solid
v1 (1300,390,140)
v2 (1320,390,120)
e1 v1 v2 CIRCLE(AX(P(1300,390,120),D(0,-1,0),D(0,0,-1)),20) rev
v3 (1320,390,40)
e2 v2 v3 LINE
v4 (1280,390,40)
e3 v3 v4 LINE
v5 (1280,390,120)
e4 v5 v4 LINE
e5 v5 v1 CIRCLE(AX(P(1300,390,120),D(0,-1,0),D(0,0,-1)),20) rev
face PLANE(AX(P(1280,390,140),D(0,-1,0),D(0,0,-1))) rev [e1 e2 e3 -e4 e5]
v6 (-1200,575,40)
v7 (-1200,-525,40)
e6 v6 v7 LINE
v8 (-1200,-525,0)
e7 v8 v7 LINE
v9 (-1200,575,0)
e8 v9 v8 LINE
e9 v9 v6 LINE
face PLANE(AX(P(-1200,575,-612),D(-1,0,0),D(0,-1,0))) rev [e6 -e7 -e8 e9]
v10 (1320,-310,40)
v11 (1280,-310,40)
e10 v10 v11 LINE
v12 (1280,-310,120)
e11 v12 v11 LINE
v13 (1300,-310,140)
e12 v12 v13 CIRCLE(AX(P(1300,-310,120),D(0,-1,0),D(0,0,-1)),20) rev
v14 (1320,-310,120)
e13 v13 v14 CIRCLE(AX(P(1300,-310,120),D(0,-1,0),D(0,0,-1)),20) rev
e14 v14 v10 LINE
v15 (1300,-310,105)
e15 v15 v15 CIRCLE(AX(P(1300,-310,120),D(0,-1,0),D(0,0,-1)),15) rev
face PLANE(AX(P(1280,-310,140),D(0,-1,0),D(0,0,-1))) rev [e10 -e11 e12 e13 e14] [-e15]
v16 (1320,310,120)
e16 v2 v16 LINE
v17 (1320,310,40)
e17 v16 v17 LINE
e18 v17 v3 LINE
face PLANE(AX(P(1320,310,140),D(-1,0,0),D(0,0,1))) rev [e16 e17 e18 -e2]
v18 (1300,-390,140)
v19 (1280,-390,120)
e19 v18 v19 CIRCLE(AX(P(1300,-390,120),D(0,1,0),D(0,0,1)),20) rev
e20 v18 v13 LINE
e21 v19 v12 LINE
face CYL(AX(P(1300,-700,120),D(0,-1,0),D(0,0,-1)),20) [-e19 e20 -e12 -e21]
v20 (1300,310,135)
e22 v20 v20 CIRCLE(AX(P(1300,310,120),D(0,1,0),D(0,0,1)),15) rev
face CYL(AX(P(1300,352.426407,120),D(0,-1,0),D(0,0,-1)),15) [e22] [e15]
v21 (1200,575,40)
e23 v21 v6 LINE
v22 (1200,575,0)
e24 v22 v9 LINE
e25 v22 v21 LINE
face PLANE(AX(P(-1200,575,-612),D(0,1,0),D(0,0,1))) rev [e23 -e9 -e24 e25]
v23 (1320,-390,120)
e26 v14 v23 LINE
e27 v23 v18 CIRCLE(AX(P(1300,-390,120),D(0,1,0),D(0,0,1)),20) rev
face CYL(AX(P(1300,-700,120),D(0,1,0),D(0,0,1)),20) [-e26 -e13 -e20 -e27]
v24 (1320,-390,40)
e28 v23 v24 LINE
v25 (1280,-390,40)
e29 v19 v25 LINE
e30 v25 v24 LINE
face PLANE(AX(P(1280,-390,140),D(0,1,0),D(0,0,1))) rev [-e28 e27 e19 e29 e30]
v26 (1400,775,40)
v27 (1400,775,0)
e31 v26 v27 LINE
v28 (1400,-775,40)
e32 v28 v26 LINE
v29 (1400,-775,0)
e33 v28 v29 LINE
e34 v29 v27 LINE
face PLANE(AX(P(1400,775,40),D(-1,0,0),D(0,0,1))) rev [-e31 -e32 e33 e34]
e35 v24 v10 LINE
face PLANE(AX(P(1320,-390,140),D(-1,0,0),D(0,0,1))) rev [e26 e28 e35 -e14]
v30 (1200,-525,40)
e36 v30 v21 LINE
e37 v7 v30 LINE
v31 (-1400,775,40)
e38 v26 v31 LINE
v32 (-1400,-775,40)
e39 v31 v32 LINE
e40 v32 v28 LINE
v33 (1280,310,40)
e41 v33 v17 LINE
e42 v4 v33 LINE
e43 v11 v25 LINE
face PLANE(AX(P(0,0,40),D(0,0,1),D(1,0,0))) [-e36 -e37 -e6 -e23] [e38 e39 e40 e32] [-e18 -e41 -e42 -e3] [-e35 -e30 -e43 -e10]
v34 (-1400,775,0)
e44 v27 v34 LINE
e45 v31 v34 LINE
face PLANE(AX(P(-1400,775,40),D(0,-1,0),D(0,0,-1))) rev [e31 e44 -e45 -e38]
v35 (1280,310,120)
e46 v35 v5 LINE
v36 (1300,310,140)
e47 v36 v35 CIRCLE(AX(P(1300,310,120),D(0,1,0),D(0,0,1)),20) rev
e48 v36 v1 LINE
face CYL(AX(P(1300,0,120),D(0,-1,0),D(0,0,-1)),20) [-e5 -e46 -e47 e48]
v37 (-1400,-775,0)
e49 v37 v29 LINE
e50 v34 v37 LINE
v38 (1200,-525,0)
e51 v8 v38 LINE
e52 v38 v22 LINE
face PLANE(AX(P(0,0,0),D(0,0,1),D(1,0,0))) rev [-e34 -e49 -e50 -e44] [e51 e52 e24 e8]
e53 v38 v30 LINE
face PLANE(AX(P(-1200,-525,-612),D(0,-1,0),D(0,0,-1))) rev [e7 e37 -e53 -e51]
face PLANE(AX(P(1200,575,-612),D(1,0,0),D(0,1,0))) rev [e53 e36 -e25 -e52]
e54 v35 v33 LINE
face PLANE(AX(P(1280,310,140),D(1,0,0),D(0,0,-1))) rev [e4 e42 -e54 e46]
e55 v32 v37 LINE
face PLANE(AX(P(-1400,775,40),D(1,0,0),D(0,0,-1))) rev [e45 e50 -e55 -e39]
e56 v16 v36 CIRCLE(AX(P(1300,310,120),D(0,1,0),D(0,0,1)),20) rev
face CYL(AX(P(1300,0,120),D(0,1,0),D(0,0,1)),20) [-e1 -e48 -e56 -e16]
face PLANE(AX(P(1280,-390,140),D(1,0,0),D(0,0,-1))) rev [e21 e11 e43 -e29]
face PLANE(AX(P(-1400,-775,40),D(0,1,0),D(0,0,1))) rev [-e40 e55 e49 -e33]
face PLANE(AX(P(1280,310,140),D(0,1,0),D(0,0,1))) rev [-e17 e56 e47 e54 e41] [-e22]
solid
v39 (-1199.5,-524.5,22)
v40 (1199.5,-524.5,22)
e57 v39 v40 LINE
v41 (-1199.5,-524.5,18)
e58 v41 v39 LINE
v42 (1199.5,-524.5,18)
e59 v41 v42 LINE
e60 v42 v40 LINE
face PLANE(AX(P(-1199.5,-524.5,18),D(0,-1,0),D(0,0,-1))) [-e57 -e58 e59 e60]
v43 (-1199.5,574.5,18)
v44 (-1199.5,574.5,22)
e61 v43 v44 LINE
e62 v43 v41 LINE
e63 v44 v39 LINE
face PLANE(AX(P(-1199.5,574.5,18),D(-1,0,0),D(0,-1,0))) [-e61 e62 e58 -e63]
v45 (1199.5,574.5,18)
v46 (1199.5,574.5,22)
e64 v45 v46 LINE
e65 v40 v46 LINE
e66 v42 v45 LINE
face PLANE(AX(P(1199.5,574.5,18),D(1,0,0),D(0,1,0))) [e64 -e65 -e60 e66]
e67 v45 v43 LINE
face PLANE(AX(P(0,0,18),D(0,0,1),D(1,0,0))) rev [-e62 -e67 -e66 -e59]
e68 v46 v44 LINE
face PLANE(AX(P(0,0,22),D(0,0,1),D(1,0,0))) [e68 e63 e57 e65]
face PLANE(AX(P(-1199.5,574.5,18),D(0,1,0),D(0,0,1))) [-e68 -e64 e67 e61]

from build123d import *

# Parameters (mm, degrees)
SKETCH1_W                = 2800
SKETCH1_H                = 1550
BOSS_EXTRUDE1_DEPTH      = 40
SKETCH3_W                = 40
SKETCH3_H                = 80
BOSS_EXTRUDE4_DEPTH      = 100
FILLET1_R                = 20
LPATTERN1_COUNT          = 2
LPATTERN1_PITCH          = 700
FILLET1_OF_LPATTERN1_R   = 20
SKETCH4_R                = 15
BOSS_EXTRUDE5_DEPTH      = 620
SKETCH5_W                = 2400
SKETCH5_H                = 1100
CUT_EXTRUDE1_DEPTH       = 652
BOSS_EXTRUDE6_DEPTH      = 2
BOSS_EXTRUDE6_DEPTH_BACK = 2
SKETCH6_W                = 2399
SKETCH6_H                = 1099


with BuildPart() as part:
    # Sketch1 → Boss-Extrude1 (new body)
    with BuildSketch(Plane.XY):
        Rectangle(SKETCH1_W, SKETCH1_H)
    extrude(amount=BOSS_EXTRUDE1_DEPTH)

    # Sketch3 → Boss-Extrude4 (add)
    with BuildSketch(Plane.XY.offset(40)):
        with Locations((1300, 350)):
            Rectangle(SKETCH3_W, SKETCH3_H)
    boss_extrude4 = extrude(amount=BOSS_EXTRUDE4_DEPTH)

    # Fillet1
    fillet1_edges = [part.edges().sort_by_distance(p)[0] for p in [
        (1280, 350, 140),
        (1320, 350, 140),
    ]]
    fillet(fillet1_edges, radius=FILLET1_R - 0.0001)  # a hair under: the kernel refuses the full size

    # LPattern1: Boss-Extrude4 ×2
    with Locations(*[(0, -i * LPATTERN1_PITCH, 0) for i in range(1, LPATTERN1_COUNT)]):
        add(boss_extrude4)

    # Fillet1 of LPattern1
    fillet1_of_lpattern1_edges = [part.edges().sort_by_distance(p)[0] for p in [
        (1280, -350, 140),
        (1320, -350, 140),
    ]]
    fillet(fillet1_of_lpattern1_edges, radius=FILLET1_OF_LPATTERN1_R - 0.0001)  # a hair under: the kernel refuses the full size

    # Sketch4 → Boss-Extrude5 (add)
    with BuildSketch(Plane(origin=(0, -310, 0), x_dir=(1, 0, 0), z_dir=(0, 1, 0))):
        with Locations(Location((1300, -120, 0), (0, 0, 90))):
            Circle(SKETCH4_R)
    extrude(amount=BOSS_EXTRUDE5_DEPTH)

    # Sketch5 → Cut-Extrude1 (cut)
    with BuildSketch(Plane.XY.offset(40)):
        with Locations((0, 25)):
            Rectangle(SKETCH5_W, SKETCH5_H)
    extrude(amount=-CUT_EXTRUDE1_DEPTH, mode=Mode.SUBTRACT)


with BuildPart() as body_2:
    # Sketch6 → Boss-Extrude6 (new, two sides: drawn at the far end of the back side and taken through both)
    with BuildSketch(Plane.XY.offset(20).offset(-BOSS_EXTRUDE6_DEPTH_BACK)):
        with Locations((0, 25)):
            Rectangle(SKETCH6_W, SKETCH6_H)
    extrude(amount=BOSS_EXTRUDE6_DEPTH + BOSS_EXTRUDE6_DEPTH_BACK)


solid = Compound([part.part, body_2.part])
